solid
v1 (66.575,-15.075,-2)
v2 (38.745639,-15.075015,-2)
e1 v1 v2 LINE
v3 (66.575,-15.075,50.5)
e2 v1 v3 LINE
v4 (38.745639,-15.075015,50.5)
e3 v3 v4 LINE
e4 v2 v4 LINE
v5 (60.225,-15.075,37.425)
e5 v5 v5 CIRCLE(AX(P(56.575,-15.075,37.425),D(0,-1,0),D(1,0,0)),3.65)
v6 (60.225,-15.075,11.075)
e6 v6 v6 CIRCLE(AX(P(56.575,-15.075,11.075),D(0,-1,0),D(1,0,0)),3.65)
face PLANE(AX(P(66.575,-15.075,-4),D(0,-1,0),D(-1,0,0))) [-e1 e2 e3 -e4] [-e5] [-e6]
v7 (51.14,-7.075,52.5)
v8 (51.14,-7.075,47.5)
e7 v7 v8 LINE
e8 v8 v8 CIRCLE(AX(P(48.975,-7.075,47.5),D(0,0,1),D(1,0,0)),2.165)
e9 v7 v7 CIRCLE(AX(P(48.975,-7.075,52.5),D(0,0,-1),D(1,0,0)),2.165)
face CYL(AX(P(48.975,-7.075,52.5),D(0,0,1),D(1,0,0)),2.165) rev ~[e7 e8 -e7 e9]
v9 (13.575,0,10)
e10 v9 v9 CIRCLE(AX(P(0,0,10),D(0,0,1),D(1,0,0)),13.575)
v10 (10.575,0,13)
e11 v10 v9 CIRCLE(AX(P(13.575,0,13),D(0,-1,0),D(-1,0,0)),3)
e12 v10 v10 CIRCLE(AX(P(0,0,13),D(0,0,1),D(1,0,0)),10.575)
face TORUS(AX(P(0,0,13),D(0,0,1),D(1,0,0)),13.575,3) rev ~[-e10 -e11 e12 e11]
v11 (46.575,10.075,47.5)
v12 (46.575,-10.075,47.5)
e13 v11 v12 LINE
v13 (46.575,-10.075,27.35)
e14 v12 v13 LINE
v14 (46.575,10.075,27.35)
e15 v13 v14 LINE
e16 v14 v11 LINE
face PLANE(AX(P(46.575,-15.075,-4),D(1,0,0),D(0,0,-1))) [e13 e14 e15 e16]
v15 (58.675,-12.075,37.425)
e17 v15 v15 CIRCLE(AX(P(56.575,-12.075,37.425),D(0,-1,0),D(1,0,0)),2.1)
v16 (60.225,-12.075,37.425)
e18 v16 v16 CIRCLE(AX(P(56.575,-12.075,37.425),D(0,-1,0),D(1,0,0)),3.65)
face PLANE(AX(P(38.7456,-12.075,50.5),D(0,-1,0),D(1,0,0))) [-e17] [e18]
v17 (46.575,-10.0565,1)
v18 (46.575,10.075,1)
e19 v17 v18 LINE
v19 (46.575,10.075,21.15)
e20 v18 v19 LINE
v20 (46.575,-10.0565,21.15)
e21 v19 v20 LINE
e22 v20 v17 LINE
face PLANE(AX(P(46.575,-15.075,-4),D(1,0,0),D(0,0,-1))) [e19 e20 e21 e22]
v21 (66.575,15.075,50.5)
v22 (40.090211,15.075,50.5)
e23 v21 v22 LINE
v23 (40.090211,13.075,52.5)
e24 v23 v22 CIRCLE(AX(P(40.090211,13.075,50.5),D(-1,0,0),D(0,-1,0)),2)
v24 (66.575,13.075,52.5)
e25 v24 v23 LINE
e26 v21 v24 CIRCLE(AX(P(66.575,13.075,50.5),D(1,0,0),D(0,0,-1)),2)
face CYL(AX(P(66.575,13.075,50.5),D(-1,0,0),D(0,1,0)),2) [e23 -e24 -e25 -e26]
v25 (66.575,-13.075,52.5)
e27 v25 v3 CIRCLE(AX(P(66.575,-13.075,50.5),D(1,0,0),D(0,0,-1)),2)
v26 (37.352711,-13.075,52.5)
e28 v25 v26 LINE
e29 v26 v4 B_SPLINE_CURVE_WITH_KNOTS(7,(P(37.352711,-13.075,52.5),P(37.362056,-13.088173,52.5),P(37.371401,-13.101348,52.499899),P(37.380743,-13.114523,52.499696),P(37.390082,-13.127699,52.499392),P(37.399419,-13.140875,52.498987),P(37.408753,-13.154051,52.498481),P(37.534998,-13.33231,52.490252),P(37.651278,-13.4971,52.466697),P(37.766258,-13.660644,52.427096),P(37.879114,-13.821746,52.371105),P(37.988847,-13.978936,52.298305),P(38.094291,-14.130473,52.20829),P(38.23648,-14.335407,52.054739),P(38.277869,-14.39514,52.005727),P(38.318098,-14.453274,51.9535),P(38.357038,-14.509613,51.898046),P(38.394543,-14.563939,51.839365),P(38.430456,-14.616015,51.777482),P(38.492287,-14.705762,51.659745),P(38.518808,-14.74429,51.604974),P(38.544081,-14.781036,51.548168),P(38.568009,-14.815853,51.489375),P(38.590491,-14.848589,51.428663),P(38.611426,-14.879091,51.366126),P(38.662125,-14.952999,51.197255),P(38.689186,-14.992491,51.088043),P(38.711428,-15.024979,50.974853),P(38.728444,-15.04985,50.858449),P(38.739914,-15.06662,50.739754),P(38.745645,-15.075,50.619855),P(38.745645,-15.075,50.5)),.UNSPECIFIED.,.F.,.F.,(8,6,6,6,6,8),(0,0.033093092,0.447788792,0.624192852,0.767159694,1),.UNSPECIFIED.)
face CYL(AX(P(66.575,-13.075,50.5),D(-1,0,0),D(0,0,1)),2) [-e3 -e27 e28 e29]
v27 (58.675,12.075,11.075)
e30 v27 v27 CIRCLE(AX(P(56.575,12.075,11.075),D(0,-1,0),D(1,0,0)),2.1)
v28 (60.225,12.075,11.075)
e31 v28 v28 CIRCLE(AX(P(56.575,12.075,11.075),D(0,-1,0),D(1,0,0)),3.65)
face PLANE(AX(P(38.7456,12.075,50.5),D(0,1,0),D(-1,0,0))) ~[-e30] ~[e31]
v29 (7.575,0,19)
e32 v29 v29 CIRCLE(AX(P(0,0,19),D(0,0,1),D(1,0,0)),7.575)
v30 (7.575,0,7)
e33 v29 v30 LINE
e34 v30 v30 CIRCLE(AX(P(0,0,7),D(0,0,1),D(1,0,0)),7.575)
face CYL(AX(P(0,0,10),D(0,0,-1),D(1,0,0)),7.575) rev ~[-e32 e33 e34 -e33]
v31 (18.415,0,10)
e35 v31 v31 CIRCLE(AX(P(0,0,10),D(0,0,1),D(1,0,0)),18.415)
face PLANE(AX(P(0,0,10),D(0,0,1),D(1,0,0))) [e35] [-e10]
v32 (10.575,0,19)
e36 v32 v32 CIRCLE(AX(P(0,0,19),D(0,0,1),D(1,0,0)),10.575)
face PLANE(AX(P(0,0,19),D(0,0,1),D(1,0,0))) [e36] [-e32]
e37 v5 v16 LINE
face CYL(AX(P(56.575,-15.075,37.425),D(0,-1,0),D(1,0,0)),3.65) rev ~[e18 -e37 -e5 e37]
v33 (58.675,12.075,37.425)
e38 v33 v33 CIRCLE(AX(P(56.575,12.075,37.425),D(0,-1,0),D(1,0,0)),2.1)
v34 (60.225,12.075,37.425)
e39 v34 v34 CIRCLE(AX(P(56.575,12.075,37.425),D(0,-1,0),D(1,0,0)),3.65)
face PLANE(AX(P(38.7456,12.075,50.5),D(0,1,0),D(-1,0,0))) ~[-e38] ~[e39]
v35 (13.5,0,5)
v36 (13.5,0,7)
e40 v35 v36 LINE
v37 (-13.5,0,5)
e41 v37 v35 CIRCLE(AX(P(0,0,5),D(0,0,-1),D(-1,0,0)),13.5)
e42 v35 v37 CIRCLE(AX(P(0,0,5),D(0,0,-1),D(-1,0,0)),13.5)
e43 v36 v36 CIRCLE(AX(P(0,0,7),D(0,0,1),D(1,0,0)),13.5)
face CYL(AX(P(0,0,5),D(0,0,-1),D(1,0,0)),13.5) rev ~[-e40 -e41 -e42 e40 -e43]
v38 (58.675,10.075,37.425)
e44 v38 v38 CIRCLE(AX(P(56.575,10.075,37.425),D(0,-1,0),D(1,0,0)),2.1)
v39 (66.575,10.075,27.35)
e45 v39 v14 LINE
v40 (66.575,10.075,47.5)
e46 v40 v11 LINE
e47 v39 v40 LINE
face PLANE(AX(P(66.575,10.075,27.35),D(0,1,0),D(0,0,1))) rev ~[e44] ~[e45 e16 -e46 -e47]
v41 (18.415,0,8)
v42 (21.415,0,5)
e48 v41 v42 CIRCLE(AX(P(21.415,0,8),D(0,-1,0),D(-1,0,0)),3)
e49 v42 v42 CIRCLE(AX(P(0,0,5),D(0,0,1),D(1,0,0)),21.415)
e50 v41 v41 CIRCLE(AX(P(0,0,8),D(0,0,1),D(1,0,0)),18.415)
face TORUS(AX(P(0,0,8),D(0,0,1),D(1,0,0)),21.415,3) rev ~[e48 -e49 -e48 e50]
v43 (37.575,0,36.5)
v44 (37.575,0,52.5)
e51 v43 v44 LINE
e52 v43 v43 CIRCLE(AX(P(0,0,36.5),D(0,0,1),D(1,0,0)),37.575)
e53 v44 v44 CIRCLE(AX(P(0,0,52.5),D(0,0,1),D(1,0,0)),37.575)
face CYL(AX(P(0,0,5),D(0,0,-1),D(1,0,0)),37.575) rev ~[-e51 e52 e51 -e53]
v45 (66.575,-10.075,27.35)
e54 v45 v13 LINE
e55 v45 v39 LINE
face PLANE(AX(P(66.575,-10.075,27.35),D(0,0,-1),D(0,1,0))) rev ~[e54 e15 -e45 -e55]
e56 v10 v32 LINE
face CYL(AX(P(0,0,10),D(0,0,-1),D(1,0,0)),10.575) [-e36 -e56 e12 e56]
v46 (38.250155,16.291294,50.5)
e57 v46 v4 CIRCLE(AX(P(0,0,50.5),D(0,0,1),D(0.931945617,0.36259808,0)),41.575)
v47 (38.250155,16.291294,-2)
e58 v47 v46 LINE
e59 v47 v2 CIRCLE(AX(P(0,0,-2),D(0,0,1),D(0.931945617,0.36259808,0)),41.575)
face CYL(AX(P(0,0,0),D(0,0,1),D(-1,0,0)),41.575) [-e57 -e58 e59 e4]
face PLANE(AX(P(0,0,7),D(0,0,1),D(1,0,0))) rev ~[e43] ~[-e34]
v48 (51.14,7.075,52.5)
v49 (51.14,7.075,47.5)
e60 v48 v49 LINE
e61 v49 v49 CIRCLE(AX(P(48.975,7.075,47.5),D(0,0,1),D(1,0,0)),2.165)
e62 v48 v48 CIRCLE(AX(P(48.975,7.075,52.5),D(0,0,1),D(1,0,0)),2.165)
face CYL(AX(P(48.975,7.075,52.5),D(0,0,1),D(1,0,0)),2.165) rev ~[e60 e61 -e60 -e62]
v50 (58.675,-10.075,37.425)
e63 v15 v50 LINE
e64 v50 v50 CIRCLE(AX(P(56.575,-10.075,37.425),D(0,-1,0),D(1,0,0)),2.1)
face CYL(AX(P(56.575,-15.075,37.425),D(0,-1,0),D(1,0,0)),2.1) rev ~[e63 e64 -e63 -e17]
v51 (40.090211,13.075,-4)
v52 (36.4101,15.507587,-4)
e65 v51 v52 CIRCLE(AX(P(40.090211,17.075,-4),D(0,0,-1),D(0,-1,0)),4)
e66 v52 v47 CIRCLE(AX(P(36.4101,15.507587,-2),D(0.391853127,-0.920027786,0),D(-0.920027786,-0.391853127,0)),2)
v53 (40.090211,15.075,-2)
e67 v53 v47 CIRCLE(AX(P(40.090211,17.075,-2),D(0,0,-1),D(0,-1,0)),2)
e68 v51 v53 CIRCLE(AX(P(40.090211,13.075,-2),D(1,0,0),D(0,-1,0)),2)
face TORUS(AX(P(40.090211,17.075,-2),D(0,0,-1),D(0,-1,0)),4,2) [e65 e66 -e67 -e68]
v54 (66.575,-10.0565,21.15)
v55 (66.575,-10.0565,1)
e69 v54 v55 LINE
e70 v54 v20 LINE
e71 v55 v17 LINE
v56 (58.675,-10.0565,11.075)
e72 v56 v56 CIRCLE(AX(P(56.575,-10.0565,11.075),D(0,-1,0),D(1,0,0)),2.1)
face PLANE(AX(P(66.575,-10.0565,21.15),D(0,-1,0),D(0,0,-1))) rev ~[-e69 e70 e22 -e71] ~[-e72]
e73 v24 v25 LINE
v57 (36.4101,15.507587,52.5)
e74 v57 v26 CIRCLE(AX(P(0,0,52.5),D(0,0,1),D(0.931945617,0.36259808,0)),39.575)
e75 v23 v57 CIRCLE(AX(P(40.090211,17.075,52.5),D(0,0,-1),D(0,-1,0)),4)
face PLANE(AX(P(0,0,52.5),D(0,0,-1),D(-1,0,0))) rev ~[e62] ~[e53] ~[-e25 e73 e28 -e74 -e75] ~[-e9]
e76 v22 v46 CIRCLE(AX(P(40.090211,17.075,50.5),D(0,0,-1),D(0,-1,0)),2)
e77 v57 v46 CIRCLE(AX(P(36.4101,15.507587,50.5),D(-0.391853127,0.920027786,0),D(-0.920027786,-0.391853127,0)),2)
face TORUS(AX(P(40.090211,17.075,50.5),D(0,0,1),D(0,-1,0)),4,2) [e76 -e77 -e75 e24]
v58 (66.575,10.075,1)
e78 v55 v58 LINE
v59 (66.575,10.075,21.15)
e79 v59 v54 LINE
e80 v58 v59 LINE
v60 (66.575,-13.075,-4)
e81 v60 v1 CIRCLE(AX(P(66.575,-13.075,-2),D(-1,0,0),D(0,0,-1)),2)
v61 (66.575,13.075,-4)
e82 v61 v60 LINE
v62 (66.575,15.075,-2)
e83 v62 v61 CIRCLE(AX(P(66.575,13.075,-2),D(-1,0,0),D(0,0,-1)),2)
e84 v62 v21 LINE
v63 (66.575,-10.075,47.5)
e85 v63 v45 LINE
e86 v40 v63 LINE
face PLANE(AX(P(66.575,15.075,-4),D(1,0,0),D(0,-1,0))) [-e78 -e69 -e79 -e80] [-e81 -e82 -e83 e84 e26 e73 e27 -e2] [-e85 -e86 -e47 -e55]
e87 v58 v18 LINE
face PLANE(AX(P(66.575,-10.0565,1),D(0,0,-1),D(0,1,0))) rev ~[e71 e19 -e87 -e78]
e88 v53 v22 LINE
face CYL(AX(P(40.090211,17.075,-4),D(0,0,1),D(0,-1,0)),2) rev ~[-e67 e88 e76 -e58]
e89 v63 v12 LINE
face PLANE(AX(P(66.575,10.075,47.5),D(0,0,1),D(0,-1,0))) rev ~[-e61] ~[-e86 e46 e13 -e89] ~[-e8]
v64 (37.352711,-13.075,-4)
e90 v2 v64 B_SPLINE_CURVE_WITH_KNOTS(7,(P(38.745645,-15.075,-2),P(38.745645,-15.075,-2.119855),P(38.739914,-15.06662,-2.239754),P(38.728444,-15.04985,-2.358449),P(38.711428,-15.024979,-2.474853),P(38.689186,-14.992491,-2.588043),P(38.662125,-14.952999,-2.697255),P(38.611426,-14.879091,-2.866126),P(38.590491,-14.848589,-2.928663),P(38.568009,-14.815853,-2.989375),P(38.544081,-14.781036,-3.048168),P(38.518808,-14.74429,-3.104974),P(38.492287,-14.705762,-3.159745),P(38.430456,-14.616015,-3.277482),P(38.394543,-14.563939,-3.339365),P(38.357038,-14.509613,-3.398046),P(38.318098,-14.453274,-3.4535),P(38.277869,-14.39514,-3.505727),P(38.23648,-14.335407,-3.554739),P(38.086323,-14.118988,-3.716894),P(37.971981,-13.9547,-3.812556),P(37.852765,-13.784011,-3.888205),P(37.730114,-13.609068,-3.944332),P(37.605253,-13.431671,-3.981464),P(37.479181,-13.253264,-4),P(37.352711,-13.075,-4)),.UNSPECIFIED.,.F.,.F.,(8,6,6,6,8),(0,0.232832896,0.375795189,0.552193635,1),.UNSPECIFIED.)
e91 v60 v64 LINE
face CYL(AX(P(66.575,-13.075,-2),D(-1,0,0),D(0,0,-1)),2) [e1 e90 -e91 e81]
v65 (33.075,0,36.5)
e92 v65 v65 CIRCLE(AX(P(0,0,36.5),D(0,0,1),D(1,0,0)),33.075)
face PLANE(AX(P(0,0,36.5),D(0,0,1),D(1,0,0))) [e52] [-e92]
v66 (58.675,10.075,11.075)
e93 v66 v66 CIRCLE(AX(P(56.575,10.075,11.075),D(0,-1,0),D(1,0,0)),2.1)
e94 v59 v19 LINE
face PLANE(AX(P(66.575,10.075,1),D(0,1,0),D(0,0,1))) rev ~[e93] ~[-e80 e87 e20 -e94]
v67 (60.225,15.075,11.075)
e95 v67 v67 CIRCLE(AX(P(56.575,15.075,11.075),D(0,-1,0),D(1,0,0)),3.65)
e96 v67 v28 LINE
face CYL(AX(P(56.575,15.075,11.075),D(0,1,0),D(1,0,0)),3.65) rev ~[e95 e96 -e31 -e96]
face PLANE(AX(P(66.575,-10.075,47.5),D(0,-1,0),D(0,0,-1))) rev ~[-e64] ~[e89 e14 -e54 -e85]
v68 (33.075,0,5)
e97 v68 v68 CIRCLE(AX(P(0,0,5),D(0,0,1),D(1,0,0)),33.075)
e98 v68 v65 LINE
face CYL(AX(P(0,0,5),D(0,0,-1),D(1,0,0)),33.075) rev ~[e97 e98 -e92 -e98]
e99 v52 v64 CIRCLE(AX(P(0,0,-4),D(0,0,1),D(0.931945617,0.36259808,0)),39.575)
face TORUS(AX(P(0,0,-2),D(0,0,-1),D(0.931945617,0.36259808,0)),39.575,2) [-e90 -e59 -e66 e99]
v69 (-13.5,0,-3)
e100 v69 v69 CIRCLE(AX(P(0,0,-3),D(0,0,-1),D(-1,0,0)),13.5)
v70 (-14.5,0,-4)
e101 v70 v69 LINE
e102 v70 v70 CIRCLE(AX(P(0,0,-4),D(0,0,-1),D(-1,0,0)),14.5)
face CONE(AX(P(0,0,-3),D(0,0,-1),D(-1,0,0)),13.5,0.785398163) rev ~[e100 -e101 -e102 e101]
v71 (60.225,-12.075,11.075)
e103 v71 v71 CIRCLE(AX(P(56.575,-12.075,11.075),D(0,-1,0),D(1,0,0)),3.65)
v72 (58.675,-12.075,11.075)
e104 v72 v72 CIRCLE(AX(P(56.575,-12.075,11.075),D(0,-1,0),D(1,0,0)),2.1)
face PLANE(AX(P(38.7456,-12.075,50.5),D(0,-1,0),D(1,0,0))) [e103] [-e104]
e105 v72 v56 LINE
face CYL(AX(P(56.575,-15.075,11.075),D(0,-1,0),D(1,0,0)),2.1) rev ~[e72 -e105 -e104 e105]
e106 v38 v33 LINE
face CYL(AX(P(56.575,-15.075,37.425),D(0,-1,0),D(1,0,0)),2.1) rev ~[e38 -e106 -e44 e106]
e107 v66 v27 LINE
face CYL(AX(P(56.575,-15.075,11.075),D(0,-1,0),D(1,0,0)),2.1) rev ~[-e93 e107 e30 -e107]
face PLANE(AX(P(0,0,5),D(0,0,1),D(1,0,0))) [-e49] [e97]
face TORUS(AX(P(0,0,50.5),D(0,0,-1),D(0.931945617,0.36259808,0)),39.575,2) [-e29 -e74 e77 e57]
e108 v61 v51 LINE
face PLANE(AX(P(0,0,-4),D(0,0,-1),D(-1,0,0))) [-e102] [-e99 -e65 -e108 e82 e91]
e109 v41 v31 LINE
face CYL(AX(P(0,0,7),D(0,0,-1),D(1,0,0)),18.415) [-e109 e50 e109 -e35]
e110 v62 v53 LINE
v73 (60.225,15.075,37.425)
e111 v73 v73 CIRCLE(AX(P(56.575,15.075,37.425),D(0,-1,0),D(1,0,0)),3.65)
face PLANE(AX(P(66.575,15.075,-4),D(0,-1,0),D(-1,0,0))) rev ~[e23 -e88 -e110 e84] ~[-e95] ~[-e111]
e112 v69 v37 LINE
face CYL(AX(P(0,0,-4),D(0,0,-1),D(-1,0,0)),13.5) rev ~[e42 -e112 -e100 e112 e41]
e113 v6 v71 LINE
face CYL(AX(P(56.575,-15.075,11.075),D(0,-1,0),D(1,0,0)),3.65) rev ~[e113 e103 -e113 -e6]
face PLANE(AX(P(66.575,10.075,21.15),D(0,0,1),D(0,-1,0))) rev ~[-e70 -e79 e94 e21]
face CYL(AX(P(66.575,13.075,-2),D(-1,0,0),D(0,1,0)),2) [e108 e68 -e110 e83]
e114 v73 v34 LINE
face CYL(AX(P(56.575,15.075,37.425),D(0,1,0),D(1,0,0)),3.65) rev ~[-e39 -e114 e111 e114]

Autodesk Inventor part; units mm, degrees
sketch "草圖1" plane through (0, 0, 0) normal (0, 0, 1) x (1, 0, 0)
  circle A0 centre (0, 0) radius 19.6
  circle A1 centre (0, 0) radius 41.575
  dimension "d0" = 39.2
  dimension "d1" = 83.15
extrude "擠出1" add sketch "草圖1" along normal blind 5
sketch "草圖2" plane through (0, 0, 0) normal (0, 0, -1) x (-1, 0, 0)
  circle A0 centre (0, 0) radius 41.575 projected
extrude "擠出2" add sketch "草圖2" along normal blind 4
sketch "草圖4" plane through (0, 0, 5) normal (0, 0, 1) x (1, 0, 0)
  circle A0 centre (0, 0) radius 41.575 projected
  circle A1 centre (0, 0) radius 37.575
  dimension "d14" = 4
extrude "擠出4" add sketch "草圖4" along normal blind 47.5
sketch "草圖5" plane through (0, 0, 5) normal (0, 0, 1) x (1, 0, 0)
  circle A0 centre (0, 0) radius 37.575 projected
  circle A1 centre (0, 0) radius 33.075
  dimension "d17" = 4.5
extrude "擠出5" add sketch "草圖5" along normal blind 31.5
sketch "草圖6" plane through (0, 0, -4) normal (0, 0, -1) x (-1, 0, 0)
  line L0 (-66.575, 15.075) -> (-66.575, -15.075)
  line L1 (-66.575, 15.075) -> (-38.7456, 15.075)
  circle A0 centre (0, 0) radius 41.575 projected
  line L2 (-66.575, -15.075) -> (-38.7456, -15.075)
  point P0 (-41.575, 0)
  dimension "d20" = 30.15
  dimension "d22" = 15.075
  dimension "d25" = 25
extrude "擠出6" add sketch "草圖6" against normal up to surface (56.5 mm away) contours L1 A0 L2 L0
sketch "草圖7" plane through (66.575, -15.075, -4) normal (1, 0, 0) x (0, 0, -1)
  line L0 (-56.5, 30.15) -> (-56.5, 0) projected
  line L1 (0, 0) -> (-56.5, 0) projected
  line L2 (0, 30.15) -> (0, 0) projected
  line L3 (0, 30.15) -> (-56.5, 30.15) projected
  line L4 (-51.5, 5) -> (-31.35, 5)
  line L5 (-31.35, 5) -> (-31.35, 25.15)
  line L6 (-31.35, 25.15) -> (-51.5, 25.15)
  line L7 (-51.5, 25.15) -> (-51.5, 5)
  line L8 (-51.5, 5) -> (-31.35, 25.15) construction
  line L9 (-31.35, 5) -> (-51.5, 25.15) construction
  line L10 (-25.15, 5.0185) -> (-5, 5.0185)
  line L11 (-5, 5.0185) -> (-5, 25.15)
  line L12 (-5, 25.15) -> (-25.15, 25.15)
  line L13 (-25.15, 25.15) -> (-25.15, 5.0185)
  line L14 (-25.15, 5.0185) -> (-5, 25.15) construction
  line L15 (-5, 5.0185) -> (-25.15, 25.15) construction
  point P0 (-4, 15.075)
  point P1 (-41.425, 15.075)
  point P2 (-15.075, 15.0842)
  dimension "d26" = 20.15
  dimension "d27" = 20.15
  dimension "d28" = 20.15
  dimension "d29" = 5
  dimension "d30" = 5
  dimension "d31" = 5
extrude "擠出7" cut sketch "草圖7" against normal blind 20 contours L7 L6 L5 L4 | L13 L12 L11 L10
fillet "圓角1" radius 2 7 edges at (52.6603, 15.075, -4) (-41.575, 0, -4) (52.6603, -15.075, -4) (38.7456, 15.075, 24.25) (52.6603, 15.075, 52.5) (-41.575, 0, 52.5) (52.6603, -15.075, 52.5)
sketch "草圖8" plane through (0, 0, 52.5) normal (0, 0, 1) x (1, 0, 0)
  line L0 (52.9465, -6.0747) -> (44.9865, -6.0635) projected
  line L1 (52.9465, -6.0747) -> (52.9551, 0.0253) projected
  line L2 (44.9951, 0.0365) -> (52.9551, 0.0253) projected
  line L3 (44.9865, -6.0635) -> (44.9951, 0.0365) projected
  circle A0 centre (48.975, -7.075) radius 2.165
  circle A1 centre (48.975, 7.075) radius 2.165
  line L4 (38.7456, -15.075) -> (66.575, -15.075) projected
  line L5 (66.575, 15.075) -> (40.0902, 15.075) projected
  point P0 (0, 0)
  dimension "d36" = 4.33
  dimension "d37" = 4.33
  dimension "d38" = 8
  dimension "d39" = 8
extrude "擠出8" cut sketch "草圖8" against normal up to surface (5 mm away) contours A0 L0 | L0 A0 | A1
sketch "草圖9" plane through (38.7456, -15.075, 50.5) normal (0, -1, 0) x (1, 0, 0)
  line L0 (27.8294, -29.35) -> (27.8294, -49.5) projected
  line L1 (27.8294, -29.35) -> (7.8294, -29.35) projected
  line L2 (7.8294, -29.35) -> (7.8294, -49.5) projected
  line L3 (27.8294, -49.5) -> (7.8294, -49.5) projected
  line L4 (27.8294, -3) -> (27.8294, -23.15) projected
  line L5 (27.8294, -3) -> (7.8294, -3) projected
  line L6 (7.8294, -3) -> (7.8294, -23.15) projected
  line L7 (27.8294, -23.15) -> (7.8294, -23.15) projected
  circle A0 centre (17.8294, -39.425) radius 2.1
  circle A1 centre (17.8294, -13.075) radius 2.1
  point P0 (-38.7456, -50.5)
  dimension "d42" = 4.2
  dimension "d43" = 4.2
extrude "擠出9" cut sketch "草圖9" against normal through all contours A0 | A1
sketch "草圖10" plane through (38.7456, -15.075, 50.5) normal (0, -1, 0) x (1, 0, 0)
  circle A0 centre (17.8294, -39.425) radius 2.1 projected
  circle A1 centre (17.8294, -39.425) radius 3.65
  circle A2 centre (17.8294, -13.075) radius 2.1 projected
  circle A3 centre (17.8294, -13.075) radius 3.65
  point P0 (-38.7456, -50.5)
  dimension "d46" = 7.3
  dimension "d47" = 7.3
extrude "擠出10" cut sketch "草圖10" against normal blind 3
mirror "鏡射1" about plane through (0, 0, 0) normal (0, 1, 0) of "擠出10"
sketch "草圖14" plane through (0, 0, 5) normal (0, 0, 1) x (1, 0, 0)
  circle A0 centre (0, 0) radius 19.6 projected
extrude "擠出13" add sketch "草圖14" against normal up to surface (9 mm away)
sketch "草圖15" plane through (0, 0, -4) normal (0, 0, -1) x (-1, 0, 0)
  circle A0 centre (0, 0) radius 13.5
  dimension "d64" = 27
extrude "擠出14" cut sketch "草圖15" against normal up to surface (9 mm away)
sketch "草圖16" plane through (0, 0, 5) normal (0, 0, 1) x (1, 0, 0)
  circle A0 centre (0, 0) radius 18.415
  circle A1 centre (0, 0) radius 13.5 projected
ref_plane "工作平面2" through (-13.4156, -13.4156, 7) normal (0, 0, 1) x (1, -0.0000484, 0)
extrude "擠出15" add sketch "草圖16" along normal up to surface (2 mm away)
ref_plane "工作平面3" through (0, 0, 7) normal (0, 0, 1) x (1, 0, 0)
sketch "草圖17" plane through (0, 0, 7) normal (0, 0, 1) x (1, 0, 0)
  circle A0 centre (0, 0) radius 7.575
  circle A1 centre (0, 0) radius 18.415 projected
  dimension "d71" = 15.15
extrude "擠出16" add sketch "草圖17" along normal blind 3
sketch "草圖18" plane through (0, 0, 10) normal (0, 0, 1) x (1, 0, 0)
  circle A0 centre (0, 0) radius 7.575 projected
  circle A1 centre (0, 0) radius 10.575
  point P0 (0, 0)
  dimension "d74" = 3
ref_plane "工作平面4" through (-7.4754, -7.4754, 19) normal (0, 0, 1) x (1, -0.0000484, 0)
extrude "擠出17" add sketch "草圖18" along normal up to surface (9 mm away)
fillet "圓角3" radius 3 2 edges at (-18.415, 0, 5) (-10.575, 0, 10)
chamfer "倒角1" distance 1 angle 45 1 edges at (13.5, 0, -4)
equation "\"d22\" = 0.5 * d20"
equation "\"d27\" = d26"
equation "\"d28\" = d26"
properties part number "j2 arm part_3D 列印"
